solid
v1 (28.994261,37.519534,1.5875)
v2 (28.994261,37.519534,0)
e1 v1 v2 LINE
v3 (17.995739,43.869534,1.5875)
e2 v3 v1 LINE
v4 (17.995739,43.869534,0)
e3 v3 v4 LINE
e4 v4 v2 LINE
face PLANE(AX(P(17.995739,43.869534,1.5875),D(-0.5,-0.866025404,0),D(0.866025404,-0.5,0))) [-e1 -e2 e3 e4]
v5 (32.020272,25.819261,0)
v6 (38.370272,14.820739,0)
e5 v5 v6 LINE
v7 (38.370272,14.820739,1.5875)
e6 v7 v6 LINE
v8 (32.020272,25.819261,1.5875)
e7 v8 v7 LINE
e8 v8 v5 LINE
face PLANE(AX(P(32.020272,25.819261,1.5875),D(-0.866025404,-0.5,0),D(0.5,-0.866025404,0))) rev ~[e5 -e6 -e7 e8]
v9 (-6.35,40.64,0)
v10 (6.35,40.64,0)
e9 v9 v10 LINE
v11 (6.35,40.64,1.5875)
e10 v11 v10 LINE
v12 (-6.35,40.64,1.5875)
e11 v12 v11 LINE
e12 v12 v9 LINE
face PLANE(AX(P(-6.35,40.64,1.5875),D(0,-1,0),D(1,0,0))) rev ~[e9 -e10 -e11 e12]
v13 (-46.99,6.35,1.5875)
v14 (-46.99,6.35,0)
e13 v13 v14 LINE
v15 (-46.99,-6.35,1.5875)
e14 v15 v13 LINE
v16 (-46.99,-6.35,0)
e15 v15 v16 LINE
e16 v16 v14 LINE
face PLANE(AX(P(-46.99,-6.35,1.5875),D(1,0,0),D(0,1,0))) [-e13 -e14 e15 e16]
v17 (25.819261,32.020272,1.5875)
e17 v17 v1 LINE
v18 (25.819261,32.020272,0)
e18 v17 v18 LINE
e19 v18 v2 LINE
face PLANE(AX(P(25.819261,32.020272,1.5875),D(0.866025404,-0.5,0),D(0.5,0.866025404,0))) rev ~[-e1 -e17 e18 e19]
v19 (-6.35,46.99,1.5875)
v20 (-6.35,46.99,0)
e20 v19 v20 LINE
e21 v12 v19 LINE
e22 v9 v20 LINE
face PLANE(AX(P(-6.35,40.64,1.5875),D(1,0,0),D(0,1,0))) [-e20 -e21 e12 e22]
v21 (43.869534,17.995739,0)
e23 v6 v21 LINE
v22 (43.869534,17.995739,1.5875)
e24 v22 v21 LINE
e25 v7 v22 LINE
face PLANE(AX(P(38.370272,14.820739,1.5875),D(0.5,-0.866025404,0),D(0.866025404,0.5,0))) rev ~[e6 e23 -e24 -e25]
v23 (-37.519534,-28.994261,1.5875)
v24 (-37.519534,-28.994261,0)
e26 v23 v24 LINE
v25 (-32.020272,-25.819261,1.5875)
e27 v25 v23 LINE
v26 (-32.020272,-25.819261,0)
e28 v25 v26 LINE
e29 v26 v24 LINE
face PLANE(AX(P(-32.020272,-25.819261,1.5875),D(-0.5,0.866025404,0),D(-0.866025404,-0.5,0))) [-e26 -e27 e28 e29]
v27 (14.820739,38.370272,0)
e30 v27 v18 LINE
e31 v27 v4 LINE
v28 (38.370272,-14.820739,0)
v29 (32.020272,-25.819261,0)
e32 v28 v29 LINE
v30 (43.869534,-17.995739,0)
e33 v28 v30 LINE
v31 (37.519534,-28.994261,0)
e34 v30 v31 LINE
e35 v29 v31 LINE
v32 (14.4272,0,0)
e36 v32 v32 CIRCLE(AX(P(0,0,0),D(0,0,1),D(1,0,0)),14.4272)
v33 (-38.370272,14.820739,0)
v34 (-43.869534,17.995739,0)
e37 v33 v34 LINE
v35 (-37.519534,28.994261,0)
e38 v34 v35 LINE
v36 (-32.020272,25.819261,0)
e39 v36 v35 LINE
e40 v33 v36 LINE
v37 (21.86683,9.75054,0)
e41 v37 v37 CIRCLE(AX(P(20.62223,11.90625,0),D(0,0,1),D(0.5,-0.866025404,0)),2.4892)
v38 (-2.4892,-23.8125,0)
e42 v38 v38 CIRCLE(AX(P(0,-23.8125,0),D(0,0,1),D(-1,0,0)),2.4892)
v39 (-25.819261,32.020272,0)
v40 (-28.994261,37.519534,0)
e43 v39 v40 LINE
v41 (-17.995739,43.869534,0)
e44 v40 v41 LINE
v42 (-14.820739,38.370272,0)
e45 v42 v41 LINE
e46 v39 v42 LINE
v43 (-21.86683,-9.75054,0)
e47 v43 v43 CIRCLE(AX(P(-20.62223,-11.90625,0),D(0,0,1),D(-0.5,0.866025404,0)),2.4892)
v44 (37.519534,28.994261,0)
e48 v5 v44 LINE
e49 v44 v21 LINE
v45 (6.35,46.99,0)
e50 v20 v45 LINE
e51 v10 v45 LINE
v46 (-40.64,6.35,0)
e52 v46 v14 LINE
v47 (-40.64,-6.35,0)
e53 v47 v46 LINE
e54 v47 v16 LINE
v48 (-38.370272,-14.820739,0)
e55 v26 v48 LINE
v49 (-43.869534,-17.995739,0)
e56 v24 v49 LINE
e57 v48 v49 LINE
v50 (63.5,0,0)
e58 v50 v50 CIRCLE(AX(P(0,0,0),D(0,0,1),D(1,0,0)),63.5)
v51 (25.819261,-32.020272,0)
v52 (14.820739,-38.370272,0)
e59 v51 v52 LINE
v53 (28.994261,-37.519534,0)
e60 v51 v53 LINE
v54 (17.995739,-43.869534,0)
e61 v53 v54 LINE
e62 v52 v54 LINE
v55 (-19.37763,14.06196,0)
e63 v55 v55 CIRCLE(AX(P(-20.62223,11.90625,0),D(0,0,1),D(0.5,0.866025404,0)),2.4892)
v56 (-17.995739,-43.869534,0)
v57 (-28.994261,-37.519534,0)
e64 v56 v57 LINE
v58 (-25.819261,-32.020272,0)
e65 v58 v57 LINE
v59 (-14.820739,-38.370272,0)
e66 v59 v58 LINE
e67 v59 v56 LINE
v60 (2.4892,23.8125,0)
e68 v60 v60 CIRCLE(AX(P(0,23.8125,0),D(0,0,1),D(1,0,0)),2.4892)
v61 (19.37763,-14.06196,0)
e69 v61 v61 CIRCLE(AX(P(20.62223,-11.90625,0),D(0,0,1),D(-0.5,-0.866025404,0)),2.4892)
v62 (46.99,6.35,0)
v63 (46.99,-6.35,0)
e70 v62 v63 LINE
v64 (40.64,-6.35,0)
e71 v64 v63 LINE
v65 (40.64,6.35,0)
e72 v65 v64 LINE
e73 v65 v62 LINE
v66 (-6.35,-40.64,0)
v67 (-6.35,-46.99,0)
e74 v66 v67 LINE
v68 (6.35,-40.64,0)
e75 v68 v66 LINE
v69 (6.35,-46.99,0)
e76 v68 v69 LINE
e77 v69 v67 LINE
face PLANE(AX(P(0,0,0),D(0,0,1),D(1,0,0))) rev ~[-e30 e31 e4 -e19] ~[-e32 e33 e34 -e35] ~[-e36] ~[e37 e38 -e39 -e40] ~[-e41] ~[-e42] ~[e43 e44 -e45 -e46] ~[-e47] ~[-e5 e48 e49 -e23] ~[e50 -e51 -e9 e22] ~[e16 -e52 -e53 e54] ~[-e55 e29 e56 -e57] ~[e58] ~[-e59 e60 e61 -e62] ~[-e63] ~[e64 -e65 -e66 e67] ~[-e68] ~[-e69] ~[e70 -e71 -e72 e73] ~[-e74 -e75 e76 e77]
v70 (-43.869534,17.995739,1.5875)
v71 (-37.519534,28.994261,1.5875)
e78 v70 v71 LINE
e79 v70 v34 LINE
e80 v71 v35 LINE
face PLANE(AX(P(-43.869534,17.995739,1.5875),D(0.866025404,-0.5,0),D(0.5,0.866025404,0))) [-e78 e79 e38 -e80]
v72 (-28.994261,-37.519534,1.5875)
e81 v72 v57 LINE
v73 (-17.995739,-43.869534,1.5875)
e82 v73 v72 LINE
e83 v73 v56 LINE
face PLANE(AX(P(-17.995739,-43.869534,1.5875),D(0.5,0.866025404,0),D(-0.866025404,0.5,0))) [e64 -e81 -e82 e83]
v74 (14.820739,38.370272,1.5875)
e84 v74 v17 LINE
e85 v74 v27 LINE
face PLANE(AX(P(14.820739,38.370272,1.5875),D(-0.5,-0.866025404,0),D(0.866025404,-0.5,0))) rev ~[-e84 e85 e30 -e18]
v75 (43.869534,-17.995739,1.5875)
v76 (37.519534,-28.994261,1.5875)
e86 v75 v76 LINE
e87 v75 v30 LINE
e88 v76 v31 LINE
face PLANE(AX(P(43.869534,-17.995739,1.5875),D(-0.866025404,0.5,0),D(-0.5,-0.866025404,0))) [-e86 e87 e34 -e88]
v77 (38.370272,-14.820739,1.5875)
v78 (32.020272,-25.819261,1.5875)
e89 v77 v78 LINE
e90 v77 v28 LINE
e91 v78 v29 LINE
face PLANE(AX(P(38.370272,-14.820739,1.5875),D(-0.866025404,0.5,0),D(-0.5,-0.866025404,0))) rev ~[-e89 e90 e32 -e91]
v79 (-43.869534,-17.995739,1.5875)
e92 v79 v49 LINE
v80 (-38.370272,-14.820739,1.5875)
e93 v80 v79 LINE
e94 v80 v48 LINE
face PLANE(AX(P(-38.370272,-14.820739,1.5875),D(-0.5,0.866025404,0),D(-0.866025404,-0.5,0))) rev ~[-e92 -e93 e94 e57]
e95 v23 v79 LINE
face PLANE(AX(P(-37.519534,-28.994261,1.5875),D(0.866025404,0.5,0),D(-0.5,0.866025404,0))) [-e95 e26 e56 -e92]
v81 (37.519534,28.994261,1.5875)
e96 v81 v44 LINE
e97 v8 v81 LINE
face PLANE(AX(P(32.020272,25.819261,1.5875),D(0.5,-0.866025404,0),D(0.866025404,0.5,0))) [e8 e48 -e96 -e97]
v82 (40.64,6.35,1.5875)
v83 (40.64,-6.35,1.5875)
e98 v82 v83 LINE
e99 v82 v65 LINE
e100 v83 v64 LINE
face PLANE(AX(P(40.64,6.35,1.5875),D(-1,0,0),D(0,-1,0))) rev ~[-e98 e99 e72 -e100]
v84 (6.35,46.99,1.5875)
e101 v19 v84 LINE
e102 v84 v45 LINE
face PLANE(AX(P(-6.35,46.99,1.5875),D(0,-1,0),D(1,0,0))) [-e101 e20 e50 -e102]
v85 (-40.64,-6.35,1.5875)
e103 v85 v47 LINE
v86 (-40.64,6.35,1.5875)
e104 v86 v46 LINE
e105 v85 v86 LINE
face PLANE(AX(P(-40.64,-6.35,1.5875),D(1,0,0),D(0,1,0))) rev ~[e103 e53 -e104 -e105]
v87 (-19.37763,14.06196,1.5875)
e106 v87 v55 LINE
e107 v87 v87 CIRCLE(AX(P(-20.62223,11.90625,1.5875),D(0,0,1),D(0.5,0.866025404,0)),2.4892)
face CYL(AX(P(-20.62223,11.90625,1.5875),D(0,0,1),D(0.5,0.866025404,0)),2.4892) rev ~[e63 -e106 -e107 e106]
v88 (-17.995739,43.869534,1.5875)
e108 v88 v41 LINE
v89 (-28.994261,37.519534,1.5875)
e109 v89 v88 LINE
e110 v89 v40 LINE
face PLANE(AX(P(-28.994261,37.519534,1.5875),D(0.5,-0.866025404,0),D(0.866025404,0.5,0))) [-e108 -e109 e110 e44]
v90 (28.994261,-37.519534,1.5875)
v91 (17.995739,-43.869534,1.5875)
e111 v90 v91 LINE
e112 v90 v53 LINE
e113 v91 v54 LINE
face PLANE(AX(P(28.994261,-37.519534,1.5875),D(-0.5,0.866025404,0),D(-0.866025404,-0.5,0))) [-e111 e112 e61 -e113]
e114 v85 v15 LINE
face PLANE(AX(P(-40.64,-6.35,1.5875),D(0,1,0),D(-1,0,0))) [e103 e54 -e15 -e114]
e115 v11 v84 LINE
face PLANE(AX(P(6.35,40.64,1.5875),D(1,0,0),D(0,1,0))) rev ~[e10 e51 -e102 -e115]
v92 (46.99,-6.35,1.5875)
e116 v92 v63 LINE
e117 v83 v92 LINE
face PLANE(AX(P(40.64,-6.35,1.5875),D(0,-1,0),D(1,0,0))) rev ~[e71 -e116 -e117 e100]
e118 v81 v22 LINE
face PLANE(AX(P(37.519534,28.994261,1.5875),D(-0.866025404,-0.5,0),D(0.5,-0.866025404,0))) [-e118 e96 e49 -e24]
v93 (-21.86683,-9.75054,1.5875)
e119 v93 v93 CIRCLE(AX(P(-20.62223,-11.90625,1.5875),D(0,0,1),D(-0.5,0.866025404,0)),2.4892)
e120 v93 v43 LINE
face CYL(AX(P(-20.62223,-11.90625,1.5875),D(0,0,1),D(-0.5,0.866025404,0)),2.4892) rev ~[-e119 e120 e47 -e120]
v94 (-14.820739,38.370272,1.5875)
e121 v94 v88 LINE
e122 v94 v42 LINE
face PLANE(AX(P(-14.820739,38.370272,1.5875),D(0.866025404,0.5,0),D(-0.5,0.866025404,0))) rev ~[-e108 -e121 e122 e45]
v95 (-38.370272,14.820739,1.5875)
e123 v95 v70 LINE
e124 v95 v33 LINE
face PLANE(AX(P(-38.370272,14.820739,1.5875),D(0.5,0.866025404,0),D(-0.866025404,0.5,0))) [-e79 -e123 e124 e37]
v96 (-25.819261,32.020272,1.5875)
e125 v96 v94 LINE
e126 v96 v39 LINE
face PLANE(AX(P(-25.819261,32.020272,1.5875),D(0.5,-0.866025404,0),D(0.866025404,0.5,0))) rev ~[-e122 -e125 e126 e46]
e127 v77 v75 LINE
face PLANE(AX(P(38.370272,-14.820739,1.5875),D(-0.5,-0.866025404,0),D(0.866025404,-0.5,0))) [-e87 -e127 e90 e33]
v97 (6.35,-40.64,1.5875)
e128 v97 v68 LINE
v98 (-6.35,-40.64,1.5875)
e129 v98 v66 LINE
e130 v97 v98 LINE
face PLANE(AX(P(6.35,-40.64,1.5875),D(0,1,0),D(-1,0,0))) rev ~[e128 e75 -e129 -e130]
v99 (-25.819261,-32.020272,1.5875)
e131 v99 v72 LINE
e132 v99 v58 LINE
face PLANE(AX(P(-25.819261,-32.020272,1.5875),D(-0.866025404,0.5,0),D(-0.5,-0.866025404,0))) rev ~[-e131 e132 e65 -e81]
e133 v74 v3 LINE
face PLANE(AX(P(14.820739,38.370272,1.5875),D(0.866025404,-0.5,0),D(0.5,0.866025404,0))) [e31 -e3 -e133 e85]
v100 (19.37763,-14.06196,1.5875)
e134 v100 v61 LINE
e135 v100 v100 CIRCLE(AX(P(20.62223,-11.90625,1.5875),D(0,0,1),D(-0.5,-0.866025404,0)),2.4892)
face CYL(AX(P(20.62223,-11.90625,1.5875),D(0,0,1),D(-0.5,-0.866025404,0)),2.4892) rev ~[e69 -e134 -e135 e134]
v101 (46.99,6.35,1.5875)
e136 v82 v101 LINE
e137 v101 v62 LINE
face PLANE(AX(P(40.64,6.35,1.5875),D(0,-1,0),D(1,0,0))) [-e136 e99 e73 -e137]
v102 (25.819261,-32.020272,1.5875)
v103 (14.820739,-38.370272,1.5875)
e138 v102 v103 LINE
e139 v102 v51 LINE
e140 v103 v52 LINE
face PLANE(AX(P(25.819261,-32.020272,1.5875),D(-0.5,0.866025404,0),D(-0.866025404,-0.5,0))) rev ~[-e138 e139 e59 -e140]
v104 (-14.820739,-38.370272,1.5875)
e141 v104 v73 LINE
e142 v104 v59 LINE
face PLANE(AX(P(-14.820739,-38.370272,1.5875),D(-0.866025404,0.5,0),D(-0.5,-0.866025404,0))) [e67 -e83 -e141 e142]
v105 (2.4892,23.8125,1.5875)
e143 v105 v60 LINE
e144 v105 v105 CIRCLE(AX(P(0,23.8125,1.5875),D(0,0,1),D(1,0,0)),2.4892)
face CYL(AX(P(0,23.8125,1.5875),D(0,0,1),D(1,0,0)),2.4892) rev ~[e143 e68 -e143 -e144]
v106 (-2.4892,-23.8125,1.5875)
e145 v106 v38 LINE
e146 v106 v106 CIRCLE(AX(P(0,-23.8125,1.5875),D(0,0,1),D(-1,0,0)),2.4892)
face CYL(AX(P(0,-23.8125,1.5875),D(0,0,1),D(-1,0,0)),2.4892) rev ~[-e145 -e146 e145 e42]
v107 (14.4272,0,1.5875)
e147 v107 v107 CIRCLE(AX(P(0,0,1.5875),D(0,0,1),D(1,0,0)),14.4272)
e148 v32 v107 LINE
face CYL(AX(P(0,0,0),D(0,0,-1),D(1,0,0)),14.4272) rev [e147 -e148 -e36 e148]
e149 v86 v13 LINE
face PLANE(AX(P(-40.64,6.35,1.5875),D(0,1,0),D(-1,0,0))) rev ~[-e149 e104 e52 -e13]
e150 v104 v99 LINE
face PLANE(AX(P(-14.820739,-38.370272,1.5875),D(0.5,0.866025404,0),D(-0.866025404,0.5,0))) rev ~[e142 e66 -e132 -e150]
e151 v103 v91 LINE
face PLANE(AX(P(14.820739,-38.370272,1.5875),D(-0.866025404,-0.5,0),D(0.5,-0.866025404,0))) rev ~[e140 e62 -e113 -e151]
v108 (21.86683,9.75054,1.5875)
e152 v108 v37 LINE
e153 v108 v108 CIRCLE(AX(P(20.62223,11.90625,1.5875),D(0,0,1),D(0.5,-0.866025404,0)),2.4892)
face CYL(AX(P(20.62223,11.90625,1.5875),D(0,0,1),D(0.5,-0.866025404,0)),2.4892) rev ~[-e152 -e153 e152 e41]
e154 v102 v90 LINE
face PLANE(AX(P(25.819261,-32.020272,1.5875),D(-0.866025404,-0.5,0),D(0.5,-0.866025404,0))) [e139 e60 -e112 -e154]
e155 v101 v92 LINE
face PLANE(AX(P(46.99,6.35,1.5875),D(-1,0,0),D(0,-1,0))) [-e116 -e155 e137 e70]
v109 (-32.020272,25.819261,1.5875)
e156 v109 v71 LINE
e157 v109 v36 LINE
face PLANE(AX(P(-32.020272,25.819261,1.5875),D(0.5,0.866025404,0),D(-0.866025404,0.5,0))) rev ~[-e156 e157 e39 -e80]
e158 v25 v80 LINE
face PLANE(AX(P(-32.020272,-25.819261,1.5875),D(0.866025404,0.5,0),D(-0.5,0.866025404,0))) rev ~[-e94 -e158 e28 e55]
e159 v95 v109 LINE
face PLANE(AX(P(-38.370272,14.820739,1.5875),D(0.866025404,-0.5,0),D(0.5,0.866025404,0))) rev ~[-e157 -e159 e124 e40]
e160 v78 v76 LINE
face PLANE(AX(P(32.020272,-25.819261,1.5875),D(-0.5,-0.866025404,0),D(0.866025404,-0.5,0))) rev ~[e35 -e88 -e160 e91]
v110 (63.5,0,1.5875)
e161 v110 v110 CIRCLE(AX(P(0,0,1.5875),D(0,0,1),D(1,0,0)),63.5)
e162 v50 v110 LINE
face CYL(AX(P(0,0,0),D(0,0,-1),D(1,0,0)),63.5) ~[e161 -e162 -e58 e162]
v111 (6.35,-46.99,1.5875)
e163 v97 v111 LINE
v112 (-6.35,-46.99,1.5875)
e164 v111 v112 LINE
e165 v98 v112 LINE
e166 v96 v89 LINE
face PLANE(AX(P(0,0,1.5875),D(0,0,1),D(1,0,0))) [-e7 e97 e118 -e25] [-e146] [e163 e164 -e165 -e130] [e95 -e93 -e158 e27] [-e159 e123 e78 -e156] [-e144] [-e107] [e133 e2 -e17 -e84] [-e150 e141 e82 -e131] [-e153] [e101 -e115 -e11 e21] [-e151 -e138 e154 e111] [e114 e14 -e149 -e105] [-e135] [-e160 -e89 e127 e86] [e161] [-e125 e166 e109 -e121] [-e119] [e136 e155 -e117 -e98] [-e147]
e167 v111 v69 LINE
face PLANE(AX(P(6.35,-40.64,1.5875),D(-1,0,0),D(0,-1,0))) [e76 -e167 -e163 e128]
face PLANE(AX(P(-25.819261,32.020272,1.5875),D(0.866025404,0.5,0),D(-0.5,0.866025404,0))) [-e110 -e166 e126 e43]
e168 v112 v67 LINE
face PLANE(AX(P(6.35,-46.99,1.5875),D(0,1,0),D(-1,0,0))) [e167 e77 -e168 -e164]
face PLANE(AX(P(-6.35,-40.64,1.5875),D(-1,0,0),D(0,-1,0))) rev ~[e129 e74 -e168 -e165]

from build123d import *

# Parameters (mm, degrees)
F0_R            = 63.5
F0_R_2          = 14.4272
F1_DEPTH        = 1.5875
F2_W            = 12.7
F2_H            = 6.35
F3_DEPTH        = 1.5885
F3_COPIES_COUNT = 12
F4_R            = 2.4892
F5_DEPTH        = 1.5885
F5_COPIES_COUNT = 6


# Not quite as in the source:
# - a pattern or mirror of a feature is missing from the dataset's text; its kind, count and spacing are read off the source's solid


with BuildPart() as f1:
    # F0 (on Top) → F1 (new body)
    with BuildSketch(Plane.XY):
        Circle(F0_R)
        Circle(F0_R_2, mode=Mode.SUBTRACT)
    extrude(amount=F1_DEPTH)

    # F2 (on face) → F3 (cut, through all)
    with BuildSketch(Plane.XY.offset(1.5875)):
        with Locations((0, 43.815)):
            Rectangle(F2_W, F2_H)
    f3 = extrude(amount=-F3_DEPTH, mode=Mode.SUBTRACT)

    # F3_copies: F3 ×12 about axis
    f3_copies_axis = Axis((0, 0, 0), (0, 0, 1))
    for i in range(1, F3_COPIES_COUNT):
        add(f3.rotate(f3_copies_axis, i * 360 / F3_COPIES_COUNT), mode=Mode.SUBTRACT)

    # F4 (on face) → F5 (cut, through all)
    with BuildSketch(Plane.XY.offset(1.5875)):
        with Locations((0, 23.8125)):
            Circle(F4_R)
    f5 = extrude(amount=-F5_DEPTH, mode=Mode.SUBTRACT)

    # F5_copies: F5 ×6 about axis
    f5_copies_axis = Axis((0, 0, 0), (0, 0, 1))
    for i in range(1, F5_COPIES_COUNT):
        add(f5.rotate(f5_copies_axis, i * 360 / F5_COPIES_COUNT), mode=Mode.SUBTRACT)


solid = f1.part
